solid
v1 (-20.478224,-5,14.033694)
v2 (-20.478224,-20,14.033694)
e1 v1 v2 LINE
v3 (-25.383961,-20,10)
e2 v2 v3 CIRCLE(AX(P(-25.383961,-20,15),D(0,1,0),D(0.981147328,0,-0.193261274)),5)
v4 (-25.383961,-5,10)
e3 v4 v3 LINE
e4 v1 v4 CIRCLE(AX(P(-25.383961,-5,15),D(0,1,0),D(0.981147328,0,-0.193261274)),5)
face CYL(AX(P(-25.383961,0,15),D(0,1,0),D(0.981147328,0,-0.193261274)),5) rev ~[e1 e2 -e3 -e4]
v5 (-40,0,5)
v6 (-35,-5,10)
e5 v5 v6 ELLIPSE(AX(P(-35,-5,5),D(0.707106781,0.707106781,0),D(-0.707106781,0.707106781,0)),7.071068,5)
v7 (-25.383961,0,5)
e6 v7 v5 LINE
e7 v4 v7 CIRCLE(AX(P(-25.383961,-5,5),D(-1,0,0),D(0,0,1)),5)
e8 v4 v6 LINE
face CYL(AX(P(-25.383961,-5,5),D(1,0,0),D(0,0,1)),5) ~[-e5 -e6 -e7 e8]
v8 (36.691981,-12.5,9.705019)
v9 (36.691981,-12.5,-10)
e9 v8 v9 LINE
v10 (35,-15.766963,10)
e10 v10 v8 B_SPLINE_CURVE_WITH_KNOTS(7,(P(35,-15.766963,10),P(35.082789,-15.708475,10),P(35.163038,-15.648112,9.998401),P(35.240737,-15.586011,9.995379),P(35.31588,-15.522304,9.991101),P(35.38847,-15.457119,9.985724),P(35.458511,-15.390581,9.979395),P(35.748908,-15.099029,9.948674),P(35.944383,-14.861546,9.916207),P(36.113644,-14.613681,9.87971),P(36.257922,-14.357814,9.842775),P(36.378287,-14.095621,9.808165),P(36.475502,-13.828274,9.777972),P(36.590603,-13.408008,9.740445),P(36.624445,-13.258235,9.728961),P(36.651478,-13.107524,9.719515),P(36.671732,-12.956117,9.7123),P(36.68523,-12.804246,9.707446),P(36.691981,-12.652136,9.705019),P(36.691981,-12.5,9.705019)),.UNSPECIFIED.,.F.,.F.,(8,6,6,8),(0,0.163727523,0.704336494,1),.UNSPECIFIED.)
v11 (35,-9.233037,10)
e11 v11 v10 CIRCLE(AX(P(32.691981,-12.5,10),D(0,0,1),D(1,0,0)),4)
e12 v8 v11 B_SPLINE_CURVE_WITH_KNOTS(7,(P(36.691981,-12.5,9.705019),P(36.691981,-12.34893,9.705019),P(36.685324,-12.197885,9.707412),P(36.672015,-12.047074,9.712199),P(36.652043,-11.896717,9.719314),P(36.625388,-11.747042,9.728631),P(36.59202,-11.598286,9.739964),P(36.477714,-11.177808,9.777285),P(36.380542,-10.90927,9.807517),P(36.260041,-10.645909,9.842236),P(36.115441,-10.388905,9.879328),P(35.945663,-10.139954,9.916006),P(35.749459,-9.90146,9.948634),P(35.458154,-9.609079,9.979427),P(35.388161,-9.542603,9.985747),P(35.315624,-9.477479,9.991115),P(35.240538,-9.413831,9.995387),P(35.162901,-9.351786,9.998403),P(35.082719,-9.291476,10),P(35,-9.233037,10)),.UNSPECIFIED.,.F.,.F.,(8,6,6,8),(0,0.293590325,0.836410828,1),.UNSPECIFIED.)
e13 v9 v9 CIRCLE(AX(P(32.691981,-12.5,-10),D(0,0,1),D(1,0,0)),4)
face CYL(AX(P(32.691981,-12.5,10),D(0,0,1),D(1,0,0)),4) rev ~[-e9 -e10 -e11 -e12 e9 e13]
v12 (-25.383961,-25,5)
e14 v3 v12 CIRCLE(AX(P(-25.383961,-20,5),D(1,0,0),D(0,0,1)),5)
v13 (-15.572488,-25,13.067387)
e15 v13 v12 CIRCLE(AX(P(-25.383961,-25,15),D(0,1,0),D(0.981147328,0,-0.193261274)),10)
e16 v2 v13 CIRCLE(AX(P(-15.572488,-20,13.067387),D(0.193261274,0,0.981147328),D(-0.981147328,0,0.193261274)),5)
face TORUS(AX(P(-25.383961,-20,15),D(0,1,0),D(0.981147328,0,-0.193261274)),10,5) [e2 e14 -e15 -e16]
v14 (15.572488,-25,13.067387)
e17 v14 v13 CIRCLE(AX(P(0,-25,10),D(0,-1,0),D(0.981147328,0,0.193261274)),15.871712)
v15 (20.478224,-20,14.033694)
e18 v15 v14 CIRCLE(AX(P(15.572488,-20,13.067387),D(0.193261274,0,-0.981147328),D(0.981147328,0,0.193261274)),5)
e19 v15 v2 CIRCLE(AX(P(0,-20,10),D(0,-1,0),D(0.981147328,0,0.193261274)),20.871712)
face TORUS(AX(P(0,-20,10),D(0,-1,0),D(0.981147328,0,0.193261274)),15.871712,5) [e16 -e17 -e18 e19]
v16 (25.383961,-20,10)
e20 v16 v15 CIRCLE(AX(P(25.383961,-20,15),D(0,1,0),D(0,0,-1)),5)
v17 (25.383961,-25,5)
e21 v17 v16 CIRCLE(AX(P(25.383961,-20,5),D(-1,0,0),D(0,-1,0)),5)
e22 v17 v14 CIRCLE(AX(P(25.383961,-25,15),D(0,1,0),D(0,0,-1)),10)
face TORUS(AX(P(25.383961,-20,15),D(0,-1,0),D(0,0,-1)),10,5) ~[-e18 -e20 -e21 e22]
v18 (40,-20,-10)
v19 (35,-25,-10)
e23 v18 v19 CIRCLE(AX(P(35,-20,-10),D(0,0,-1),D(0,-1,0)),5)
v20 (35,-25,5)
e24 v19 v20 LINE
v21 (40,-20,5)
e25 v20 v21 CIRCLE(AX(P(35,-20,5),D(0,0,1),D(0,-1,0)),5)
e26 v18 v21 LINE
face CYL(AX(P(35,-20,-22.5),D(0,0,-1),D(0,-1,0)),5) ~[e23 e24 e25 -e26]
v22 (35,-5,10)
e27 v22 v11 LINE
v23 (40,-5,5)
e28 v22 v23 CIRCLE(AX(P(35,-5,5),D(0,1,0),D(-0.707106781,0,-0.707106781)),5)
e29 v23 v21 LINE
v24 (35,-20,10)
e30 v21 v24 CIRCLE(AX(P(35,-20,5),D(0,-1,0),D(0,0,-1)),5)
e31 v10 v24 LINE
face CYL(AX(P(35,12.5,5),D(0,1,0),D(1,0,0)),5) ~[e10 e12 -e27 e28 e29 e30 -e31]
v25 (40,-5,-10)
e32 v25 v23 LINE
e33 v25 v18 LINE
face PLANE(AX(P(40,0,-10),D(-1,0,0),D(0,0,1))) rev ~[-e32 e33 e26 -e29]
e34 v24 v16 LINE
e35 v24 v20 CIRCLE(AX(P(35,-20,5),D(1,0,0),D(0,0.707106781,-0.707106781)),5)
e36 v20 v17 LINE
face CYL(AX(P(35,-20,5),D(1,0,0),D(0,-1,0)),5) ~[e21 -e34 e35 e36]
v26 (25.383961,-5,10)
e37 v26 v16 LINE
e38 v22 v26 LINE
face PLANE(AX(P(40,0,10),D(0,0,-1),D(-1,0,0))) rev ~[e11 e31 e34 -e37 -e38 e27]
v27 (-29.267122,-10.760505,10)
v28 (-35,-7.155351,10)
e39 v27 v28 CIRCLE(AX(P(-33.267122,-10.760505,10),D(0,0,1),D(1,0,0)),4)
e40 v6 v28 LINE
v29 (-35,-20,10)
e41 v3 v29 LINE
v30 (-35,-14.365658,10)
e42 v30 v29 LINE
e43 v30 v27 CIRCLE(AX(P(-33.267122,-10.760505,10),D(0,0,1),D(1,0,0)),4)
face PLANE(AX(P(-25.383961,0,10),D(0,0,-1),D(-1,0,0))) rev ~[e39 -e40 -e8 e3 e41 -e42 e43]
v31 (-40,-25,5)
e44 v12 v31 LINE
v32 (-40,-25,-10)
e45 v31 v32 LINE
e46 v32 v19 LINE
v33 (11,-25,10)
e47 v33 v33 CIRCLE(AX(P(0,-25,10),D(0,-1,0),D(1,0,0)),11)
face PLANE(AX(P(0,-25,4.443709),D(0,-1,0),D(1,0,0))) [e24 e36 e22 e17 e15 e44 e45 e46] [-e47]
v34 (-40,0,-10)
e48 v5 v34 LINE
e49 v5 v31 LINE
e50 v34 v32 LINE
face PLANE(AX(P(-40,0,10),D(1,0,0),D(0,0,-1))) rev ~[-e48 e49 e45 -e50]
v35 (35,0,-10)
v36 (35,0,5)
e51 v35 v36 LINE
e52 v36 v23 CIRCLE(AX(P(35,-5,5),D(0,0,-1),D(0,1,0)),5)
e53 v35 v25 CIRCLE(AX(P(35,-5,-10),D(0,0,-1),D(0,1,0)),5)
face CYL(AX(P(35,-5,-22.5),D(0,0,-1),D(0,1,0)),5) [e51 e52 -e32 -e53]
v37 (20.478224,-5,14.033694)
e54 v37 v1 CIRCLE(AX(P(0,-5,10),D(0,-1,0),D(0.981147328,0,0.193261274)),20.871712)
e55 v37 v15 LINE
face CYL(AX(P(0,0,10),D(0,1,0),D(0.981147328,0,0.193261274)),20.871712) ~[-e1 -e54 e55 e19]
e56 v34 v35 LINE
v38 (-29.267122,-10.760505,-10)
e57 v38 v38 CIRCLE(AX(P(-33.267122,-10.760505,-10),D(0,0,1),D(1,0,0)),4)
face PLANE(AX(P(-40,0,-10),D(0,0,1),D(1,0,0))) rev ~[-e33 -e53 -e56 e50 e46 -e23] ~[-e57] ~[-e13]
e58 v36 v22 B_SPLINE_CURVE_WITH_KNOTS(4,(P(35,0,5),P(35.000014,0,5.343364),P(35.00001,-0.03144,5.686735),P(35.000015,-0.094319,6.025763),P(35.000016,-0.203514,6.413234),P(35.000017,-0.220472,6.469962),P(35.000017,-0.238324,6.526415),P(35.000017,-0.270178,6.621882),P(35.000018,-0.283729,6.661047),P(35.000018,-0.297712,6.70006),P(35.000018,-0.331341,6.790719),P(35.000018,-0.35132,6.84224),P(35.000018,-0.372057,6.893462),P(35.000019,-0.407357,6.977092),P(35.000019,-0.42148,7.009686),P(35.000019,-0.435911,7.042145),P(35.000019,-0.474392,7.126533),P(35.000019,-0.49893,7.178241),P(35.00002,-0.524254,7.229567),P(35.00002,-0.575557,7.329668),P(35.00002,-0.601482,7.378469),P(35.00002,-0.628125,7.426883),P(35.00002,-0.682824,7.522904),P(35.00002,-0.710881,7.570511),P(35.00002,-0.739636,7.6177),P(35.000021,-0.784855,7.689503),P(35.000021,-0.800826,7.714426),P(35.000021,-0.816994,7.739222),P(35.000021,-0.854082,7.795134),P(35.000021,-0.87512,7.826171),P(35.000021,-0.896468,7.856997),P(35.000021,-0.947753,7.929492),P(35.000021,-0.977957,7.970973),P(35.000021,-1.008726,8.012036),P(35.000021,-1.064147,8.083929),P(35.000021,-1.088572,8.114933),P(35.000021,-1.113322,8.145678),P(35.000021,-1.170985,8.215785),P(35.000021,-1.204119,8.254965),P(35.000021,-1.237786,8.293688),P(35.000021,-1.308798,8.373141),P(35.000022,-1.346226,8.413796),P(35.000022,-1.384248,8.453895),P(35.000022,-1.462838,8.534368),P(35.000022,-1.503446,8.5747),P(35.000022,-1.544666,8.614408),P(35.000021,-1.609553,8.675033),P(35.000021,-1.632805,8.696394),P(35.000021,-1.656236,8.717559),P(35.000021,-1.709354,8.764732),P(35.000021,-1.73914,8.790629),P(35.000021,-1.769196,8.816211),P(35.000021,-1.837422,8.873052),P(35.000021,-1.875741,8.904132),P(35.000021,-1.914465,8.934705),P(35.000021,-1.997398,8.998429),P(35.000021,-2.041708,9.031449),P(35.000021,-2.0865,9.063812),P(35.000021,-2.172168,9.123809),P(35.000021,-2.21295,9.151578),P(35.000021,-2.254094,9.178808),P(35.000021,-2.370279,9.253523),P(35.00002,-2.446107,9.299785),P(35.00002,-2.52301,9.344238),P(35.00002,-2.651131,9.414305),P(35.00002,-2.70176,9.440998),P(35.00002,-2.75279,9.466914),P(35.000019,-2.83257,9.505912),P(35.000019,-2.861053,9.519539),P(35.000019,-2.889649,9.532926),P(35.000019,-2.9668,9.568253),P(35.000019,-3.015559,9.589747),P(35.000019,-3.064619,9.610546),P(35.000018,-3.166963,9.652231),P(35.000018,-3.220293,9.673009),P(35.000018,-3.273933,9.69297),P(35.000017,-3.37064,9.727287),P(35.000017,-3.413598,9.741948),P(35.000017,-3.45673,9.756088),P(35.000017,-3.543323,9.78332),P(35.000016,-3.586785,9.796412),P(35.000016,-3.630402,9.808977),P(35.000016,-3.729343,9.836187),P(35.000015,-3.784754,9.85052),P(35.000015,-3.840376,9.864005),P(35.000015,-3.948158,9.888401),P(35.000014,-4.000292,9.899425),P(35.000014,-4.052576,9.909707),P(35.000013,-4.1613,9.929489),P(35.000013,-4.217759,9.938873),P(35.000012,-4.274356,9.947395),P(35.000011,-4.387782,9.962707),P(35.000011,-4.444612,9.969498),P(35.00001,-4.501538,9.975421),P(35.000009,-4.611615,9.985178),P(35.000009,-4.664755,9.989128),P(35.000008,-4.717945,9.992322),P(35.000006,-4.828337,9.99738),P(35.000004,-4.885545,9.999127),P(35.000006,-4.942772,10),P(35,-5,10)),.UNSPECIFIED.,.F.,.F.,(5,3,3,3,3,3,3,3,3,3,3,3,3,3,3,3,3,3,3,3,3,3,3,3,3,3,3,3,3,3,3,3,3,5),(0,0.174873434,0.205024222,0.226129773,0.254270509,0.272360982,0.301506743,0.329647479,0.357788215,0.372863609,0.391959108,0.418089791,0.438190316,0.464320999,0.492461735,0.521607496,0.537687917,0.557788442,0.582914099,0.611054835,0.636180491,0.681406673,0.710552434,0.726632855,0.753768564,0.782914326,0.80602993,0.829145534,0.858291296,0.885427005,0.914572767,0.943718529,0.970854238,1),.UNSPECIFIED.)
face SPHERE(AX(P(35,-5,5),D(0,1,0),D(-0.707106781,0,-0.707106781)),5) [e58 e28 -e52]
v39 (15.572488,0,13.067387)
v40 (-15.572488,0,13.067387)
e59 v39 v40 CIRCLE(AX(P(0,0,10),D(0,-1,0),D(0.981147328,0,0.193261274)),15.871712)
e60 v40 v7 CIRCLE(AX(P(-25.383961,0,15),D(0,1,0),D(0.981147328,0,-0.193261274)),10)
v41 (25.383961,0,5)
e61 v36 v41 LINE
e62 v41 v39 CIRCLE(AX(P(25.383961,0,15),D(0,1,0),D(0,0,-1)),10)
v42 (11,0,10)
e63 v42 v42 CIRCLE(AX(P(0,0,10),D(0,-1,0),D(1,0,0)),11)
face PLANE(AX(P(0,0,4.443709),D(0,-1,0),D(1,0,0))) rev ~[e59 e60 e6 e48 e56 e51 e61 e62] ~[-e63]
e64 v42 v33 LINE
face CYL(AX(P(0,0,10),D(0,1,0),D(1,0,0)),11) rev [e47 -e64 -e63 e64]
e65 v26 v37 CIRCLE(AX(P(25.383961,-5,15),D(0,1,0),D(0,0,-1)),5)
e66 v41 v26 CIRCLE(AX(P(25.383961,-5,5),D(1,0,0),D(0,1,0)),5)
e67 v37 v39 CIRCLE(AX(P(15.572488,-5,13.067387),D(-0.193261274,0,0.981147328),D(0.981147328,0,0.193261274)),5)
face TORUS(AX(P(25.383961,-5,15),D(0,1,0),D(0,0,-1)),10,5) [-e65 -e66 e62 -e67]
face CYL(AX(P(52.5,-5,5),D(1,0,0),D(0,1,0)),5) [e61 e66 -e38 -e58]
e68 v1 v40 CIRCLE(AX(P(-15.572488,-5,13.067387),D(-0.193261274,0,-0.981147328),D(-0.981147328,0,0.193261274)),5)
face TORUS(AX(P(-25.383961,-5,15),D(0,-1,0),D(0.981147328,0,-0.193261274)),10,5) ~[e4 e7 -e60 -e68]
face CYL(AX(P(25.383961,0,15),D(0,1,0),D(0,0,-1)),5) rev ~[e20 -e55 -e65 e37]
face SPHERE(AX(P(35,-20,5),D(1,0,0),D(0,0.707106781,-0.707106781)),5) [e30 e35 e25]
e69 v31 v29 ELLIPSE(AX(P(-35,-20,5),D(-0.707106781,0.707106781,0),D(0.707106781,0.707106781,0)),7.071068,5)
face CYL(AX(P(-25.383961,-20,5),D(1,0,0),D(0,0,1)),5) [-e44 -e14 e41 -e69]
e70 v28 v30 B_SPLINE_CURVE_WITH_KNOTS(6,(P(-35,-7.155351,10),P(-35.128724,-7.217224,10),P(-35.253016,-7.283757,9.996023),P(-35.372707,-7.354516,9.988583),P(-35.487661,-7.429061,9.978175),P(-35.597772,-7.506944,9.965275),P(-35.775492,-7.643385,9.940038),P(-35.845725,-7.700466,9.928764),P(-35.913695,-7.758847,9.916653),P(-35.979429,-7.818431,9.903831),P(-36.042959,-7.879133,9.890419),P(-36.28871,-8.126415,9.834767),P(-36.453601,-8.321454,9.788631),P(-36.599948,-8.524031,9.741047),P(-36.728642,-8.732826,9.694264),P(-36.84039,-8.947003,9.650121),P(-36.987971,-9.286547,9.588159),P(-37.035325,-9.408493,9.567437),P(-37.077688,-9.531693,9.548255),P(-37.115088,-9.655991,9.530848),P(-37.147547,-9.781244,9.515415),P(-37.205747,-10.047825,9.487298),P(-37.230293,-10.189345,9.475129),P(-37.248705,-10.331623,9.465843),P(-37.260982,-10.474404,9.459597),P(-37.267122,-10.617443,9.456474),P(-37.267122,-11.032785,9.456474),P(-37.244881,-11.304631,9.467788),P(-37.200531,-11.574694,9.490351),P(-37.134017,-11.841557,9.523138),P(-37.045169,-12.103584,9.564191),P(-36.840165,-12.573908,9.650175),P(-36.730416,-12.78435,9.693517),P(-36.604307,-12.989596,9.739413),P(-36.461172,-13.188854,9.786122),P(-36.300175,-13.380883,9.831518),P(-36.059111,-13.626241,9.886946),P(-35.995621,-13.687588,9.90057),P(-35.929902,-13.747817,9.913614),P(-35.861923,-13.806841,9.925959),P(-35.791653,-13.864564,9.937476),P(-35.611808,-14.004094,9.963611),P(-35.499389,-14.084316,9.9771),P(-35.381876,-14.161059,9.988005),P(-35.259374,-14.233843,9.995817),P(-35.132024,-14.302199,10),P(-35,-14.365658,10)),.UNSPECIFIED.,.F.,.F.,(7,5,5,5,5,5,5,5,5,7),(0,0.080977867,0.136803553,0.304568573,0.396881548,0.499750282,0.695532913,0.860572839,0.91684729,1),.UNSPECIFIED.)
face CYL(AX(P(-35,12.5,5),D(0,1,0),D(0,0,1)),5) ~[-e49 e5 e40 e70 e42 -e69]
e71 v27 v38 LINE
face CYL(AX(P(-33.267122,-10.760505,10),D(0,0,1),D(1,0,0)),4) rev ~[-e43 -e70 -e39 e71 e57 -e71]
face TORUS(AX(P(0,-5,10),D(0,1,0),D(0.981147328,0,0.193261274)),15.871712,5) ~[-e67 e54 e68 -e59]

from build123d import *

# Parameters (mm, degrees)
F0_R         = 11
F1_DEPTH     = 25
F2_R         = 4
F4_DEPTH     = 25
F3_R         = 4
F5_DEPTH     = 25
F6_S2_W      = 5
F6_S2_H      = 5
F6_T3_DEPTH  = 5
F6_T8_ANGLE  = 157.7136601513
F6_T11_DEPTH = 32.5
F6_T14_DEPTH = 27.5
F6_T17_ANGLE = 157.7136601513
F6_T20_DEPTH = 50
F6_T23_ANGLE = 78.8568300757
F6_T26_ANGLE = 78.8568300757
F6_T29_DEPTH = 27.1160389937
F6_T32_DEPTH = 27.1160389937
F6_T35_ANGLE = 78.8568300757
F6_T38_ANGLE = 78.8568300757
F6_T41_DEPTH = 27.1160389937
F6_T44_DEPTH = 9.6160389937
F7_T1_DEPTH  = 27.5
F7_S5_W      = 5
F7_S5_H      = 5
F7_T6_DEPTH  = 5


# Not quite as in the source:
# - a fillet or chamfer that OpenCascade refuses, or shapes differently, is made with other operations: its cross-section is extruded or revolved along the edge and cut away or added


with BuildPart() as f1:
    # F0 (on Front) → F1 (new body)
    with BuildSketch(Plane.XZ):
        with BuildLine():
            Line((-40, 10), (-40, -10))
            Line((-40, -10), (40, -10))
            Line((40, -10), (40, 10))
            Line((40, 10), (25.3839610063, 10))
            ThreePointArc((25.3839610063, 10), (22.2083926988, 11.137906536), (20.4782243644, 14.0336936303))
            ThreePointArc((20.4782243644, 14.0336936303), (0, 30.8717118949), (-20.4782243644, 14.0336936303))
            ThreePointArc((-20.4782243644, 14.0336936303), (-22.2083926988, 11.137906536), (-25.3839610063, 10))
            Line((-25.3839610063, 10), (-40, 10))
        make_face()
        with Locations((0, 10)):
            Circle(F0_R, mode=Mode.SUBTRACT)
    extrude(amount=F1_DEPTH)

    # F2 (on face) → F4 (cut)
    with BuildSketch(Plane.XY.offset(10)):
        with Locations((32.6919805032, -12.5)):
            Circle(F2_R)
    extrude(amount=-F4_DEPTH, mode=Mode.SUBTRACT)

    # F3 (on face) → F5 (cut)
    with BuildSketch(Plane.XY.offset(10)):
        with Locations((-33.267121762, -10.7605047524)):
            Circle(F3_R)
    extrude(amount=-F5_DEPTH, mode=Mode.SUBTRACT)

    # F6: fillet of radius 5 on 5 edges, made by hand


with BuildPart() as f6_tool1:
    # F6_s2 → F6_t3 (new body)
    with BuildSketch(Plane.YZ.offset(35)):
        with Locations((-22.5, 7.5)):
            Rectangle(F6_S2_W, F6_S2_H)
    extrude(amount=F6_T3_DEPTH)

    # F6_s4 → F6_t5 (revolve, cut)
    with BuildSketch(Plane(origin=(35, -20, 5), x_dir=(0, 0.7071067812, -0.7071067812), z_dir=(0, -0.7071067812, -0.7071067812))):
        with BuildLine():
            ThreePointArc((0, -5), (5, 0), (0, 5))
            Line((0, 5), (0, -5))
        make_face()
    revolve(axis=Axis((35, -20, 5), (1, 0, 0)), mode=Mode.SUBTRACT)


with BuildPart() as f6_tool6:
    # F6_s7 → F6_t8 (revolve)
    with BuildSketch(Plane(origin=(-1.8961778261, 0, 9.6265007999), x_dir=(0, 1, 0), z_dir=(0.1932612739, 0, -0.9811473284))):
        with BuildLine():
            ThreePointArc((-20, 22.8043246343), (-23.5355339059, 21.3398585403), (-25, 17.8043246343))
            Line((-25, 17.8043246343), (-25, 22.8043246343))
            Line((-25, 22.8043246343), (-20, 22.8043246343))
        make_face()
    revolve(axis=Axis((0, -25, 10), (0, -1, 0)), revolution_arc=F6_T8_ANGLE)


with BuildPart() as f6_tool9:
    # F6_s10 → F6_t11 (new body)
    with BuildSketch(Plane.XZ.offset(-12.5)):
        with BuildLine():
            ThreePointArc((40, 5), (38.5355339059, 8.5355339059), (35, 10))
            Line((35, 10), (40, 10))
            Line((40, 10), (40, 5))
        make_face()
    extrude(amount=F6_T11_DEPTH)


with BuildPart() as f6_tool12:
    # F6_s13 → F6_t14 (new body)
    with BuildSketch(Plane.XY.offset(-22.5)):
        with BuildLine():
            ThreePointArc((35, -25), (38.5355339059, -23.5355339059), (40, -20))
            Line((40, -20), (40, -25))
            Line((40, -25), (35, -25))
        make_face()
    extrude(amount=F6_T14_DEPTH)


with BuildPart() as f6_tool15:
    # F6_s16 → F6_t17 (revolve)
    with BuildSketch(Plane(origin=(-1.8961778261, 0, 9.6265007999), x_dir=(0, 1, 0), z_dir=(0.1932612739, 0, -0.9811473284))):
        with BuildLine():
            ThreePointArc((-5, 22.8043246343), (-1.4644660941, 21.3398585403), (0, 17.8043246343))
            Line((0, 17.8043246343), (0, 22.8043246343))
            Line((0, 22.8043246343), (-5, 22.8043246343))
        make_face()
    revolve(axis=Axis((0, 0, 10), (0, -1, 0)), revolution_arc=F6_T17_ANGLE)


with BuildPart() as f6_tool18:
    # F6_s19 → F6_t20 (new body)
    with BuildSketch(Plane.XZ.offset(-12.5)):
        with BuildLine():
            ThreePointArc((-35, 10), (-38.5355339059, 8.5355339059), (-40, 5))
            Line((-40, 5), (-40, 10))
            Line((-40, 10), (-35, 10))
        make_face()
    extrude(amount=F6_T20_DEPTH)


with BuildPart() as f6_tool21:
    # F6_s22 → F6_t23 (revolve)
    with BuildSketch(Plane.YZ.offset(25.3839610063)):
        with BuildLine():
            ThreePointArc((0, 5), (-1.4644660941, 8.5355339059), (-5, 10))
            Line((-5, 10), (0, 10))
            Line((0, 10), (0, 5))
        make_face()
    revolve(axis=Axis((25.3839610063, 0, 15), (0, 1, 0)), revolution_arc=F6_T23_ANGLE)


with BuildPart() as f6_tool24:
    # F6_s25 → F6_t26 (revolve)
    with BuildSketch(Plane(origin=(1.8961778261, 0, 9.6265007999), x_dir=(0, 1, 0), z_dir=(0.1932612739, 0, 0.9811473284))):
        with BuildLine():
            ThreePointArc((-5, 22.8043246343), (-1.4644660941, 21.3398585403), (0, 17.8043246343))
            Line((0, 17.8043246343), (0, 22.8043246343))
            Line((0, 22.8043246343), (-5, 22.8043246343))
        make_face()
    revolve(axis=Axis((-25.3839610063, 0, 15), (0, 1, 0)), revolution_arc=F6_T26_ANGLE)


with BuildPart() as f6_tool27:
    # F6_s28 → F6_t29 (new body)
    with BuildSketch(Plane.YZ.offset(-25.3839610063)):
        with BuildLine():
            ThreePointArc((-5, 10), (-1.4644660941, 8.5355339059), (0, 5))
            Line((0, 5), (0, 10))
            Line((0, 10), (-5, 10))
        make_face()
    extrude(amount=-F6_T29_DEPTH)


with BuildPart() as f6_tool30:
    # F6_s31 → F6_t32 (new body)
    with BuildSketch(Plane.YZ.offset(52.5)):
        with BuildLine():
            ThreePointArc((0, 5), (-1.4644660941, 8.5355339059), (-5, 10))
            Line((-5, 10), (0, 10))
            Line((0, 10), (0, 5))
        make_face()
    extrude(amount=-F6_T32_DEPTH)


with BuildPart() as f6_tool33:
    # F6_s34 → F6_t35 (revolve)
    with BuildSketch(Plane.YZ.offset(25.3839610063)):
        with BuildLine():
            ThreePointArc((-25, 5), (-23.5355339059, 8.5355339059), (-20, 10))
            Line((-20, 10), (-25, 10))
            Line((-25, 10), (-25, 5))
        make_face()
    revolve(axis=Axis((25.3839610063, -25, 15), (0, 1, 0)), revolution_arc=F6_T35_ANGLE)


with BuildPart() as f6_tool36:
    # F6_s37 → F6_t38 (revolve)
    with BuildSketch(Plane(origin=(1.8961778261, 0, 9.6265007999), x_dir=(0, 1, 0), z_dir=(0.1932612739, 0, 0.9811473284))):
        with BuildLine():
            ThreePointArc((-20, 22.8043246343), (-23.5355339059, 21.3398585403), (-25, 17.8043246343))
            Line((-25, 17.8043246343), (-25, 22.8043246343))
            Line((-25, 22.8043246343), (-20, 22.8043246343))
        make_face()
    revolve(axis=Axis((-25.3839610063, -25, 15), (0, 1, 0)), revolution_arc=F6_T38_ANGLE)


with BuildPart() as f6_tool39:
    # F6_s40 → F6_t41 (new body)
    with BuildSketch(Plane.YZ.offset(-25.3839610063)):
        with BuildLine():
            ThreePointArc((-20, 10), (-23.5355339059, 8.5355339059), (-25, 5))
            Line((-25, 5), (-25, 10))
            Line((-25, 10), (-20, 10))
        make_face()
    extrude(amount=-F6_T41_DEPTH)


with BuildPart() as f6_tool42:
    # F6_s43 → F6_t44 (new body)
    with BuildSketch(Plane.YZ.offset(35)):
        with BuildLine():
            ThreePointArc((-25, 5), (-23.5355339059, 8.5355339059), (-20, 10))
            Line((-20, 10), (-25, 10))
            Line((-25, 10), (-25, 5))
        make_face()
    extrude(amount=-F6_T44_DEPTH)


with BuildPart() as f1_1:
    add(f1.part)

    # F6_t45: cut F6_tool1, F6_tool6, F6_tool9, F6_tool12, F6_tool15, F6_tool18, F6_tool21, F6_tool24, F6_tool27, F6_tool30, F6_tool33, F6_tool36, F6_tool39, F6_tool42
    add([f6_tool1.part, f6_tool6.part, f6_tool9.part, f6_tool12.part, f6_tool15.part, f6_tool18.part, f6_tool21.part, f6_tool24.part, f6_tool27.part, f6_tool30.part, f6_tool33.part, f6_tool36.part, f6_tool39.part, f6_tool42.part], mode=Mode.SUBTRACT)

    # F7: fillet of radius 5 on 1 edges, made by hand

    # F7_s2 → F7_t1 (cut)
    with BuildSketch(Plane.XY.offset(-22.5)):
        with BuildLine():
            ThreePointArc((35, 0), (38.5355339059, -1.4644660941), (40, -5))
            Line((40, -5), (40, 0))
            Line((40, 0), (35, 0))
        make_face()
    extrude(amount=F7_T1_DEPTH, mode=Mode.SUBTRACT)


with BuildPart() as f7_tool4:
    # F7_s5 → F7_t6 (new body)
    with BuildSketch(Plane.XZ.offset(5)):
        with Locations((37.5, 7.5)):
            Rectangle(F7_S5_W, F7_S5_H)
    extrude(amount=-F7_T6_DEPTH)

    # F7_s7 → F7_t8 (revolve, cut)
    with BuildSketch(Plane(origin=(35, -5, 5), x_dir=(-0.7071067812, 0, -0.7071067812), z_dir=(0.7071067812, 0, -0.7071067812))):
        with BuildLine():
            ThreePointArc((0, -5), (5, 0), (0, 5))
            Line((0, 5), (0, -5))
        make_face()
    revolve(axis=Axis((35, -5, 5), (0, 1, 0)), mode=Mode.SUBTRACT)


with BuildPart() as f1_2:
    add(f1_1.part)

    # F7_t3: cut F7_tool4
    add(f7_tool4.part, mode=Mode.SUBTRACT)


solid = f1_2.part
